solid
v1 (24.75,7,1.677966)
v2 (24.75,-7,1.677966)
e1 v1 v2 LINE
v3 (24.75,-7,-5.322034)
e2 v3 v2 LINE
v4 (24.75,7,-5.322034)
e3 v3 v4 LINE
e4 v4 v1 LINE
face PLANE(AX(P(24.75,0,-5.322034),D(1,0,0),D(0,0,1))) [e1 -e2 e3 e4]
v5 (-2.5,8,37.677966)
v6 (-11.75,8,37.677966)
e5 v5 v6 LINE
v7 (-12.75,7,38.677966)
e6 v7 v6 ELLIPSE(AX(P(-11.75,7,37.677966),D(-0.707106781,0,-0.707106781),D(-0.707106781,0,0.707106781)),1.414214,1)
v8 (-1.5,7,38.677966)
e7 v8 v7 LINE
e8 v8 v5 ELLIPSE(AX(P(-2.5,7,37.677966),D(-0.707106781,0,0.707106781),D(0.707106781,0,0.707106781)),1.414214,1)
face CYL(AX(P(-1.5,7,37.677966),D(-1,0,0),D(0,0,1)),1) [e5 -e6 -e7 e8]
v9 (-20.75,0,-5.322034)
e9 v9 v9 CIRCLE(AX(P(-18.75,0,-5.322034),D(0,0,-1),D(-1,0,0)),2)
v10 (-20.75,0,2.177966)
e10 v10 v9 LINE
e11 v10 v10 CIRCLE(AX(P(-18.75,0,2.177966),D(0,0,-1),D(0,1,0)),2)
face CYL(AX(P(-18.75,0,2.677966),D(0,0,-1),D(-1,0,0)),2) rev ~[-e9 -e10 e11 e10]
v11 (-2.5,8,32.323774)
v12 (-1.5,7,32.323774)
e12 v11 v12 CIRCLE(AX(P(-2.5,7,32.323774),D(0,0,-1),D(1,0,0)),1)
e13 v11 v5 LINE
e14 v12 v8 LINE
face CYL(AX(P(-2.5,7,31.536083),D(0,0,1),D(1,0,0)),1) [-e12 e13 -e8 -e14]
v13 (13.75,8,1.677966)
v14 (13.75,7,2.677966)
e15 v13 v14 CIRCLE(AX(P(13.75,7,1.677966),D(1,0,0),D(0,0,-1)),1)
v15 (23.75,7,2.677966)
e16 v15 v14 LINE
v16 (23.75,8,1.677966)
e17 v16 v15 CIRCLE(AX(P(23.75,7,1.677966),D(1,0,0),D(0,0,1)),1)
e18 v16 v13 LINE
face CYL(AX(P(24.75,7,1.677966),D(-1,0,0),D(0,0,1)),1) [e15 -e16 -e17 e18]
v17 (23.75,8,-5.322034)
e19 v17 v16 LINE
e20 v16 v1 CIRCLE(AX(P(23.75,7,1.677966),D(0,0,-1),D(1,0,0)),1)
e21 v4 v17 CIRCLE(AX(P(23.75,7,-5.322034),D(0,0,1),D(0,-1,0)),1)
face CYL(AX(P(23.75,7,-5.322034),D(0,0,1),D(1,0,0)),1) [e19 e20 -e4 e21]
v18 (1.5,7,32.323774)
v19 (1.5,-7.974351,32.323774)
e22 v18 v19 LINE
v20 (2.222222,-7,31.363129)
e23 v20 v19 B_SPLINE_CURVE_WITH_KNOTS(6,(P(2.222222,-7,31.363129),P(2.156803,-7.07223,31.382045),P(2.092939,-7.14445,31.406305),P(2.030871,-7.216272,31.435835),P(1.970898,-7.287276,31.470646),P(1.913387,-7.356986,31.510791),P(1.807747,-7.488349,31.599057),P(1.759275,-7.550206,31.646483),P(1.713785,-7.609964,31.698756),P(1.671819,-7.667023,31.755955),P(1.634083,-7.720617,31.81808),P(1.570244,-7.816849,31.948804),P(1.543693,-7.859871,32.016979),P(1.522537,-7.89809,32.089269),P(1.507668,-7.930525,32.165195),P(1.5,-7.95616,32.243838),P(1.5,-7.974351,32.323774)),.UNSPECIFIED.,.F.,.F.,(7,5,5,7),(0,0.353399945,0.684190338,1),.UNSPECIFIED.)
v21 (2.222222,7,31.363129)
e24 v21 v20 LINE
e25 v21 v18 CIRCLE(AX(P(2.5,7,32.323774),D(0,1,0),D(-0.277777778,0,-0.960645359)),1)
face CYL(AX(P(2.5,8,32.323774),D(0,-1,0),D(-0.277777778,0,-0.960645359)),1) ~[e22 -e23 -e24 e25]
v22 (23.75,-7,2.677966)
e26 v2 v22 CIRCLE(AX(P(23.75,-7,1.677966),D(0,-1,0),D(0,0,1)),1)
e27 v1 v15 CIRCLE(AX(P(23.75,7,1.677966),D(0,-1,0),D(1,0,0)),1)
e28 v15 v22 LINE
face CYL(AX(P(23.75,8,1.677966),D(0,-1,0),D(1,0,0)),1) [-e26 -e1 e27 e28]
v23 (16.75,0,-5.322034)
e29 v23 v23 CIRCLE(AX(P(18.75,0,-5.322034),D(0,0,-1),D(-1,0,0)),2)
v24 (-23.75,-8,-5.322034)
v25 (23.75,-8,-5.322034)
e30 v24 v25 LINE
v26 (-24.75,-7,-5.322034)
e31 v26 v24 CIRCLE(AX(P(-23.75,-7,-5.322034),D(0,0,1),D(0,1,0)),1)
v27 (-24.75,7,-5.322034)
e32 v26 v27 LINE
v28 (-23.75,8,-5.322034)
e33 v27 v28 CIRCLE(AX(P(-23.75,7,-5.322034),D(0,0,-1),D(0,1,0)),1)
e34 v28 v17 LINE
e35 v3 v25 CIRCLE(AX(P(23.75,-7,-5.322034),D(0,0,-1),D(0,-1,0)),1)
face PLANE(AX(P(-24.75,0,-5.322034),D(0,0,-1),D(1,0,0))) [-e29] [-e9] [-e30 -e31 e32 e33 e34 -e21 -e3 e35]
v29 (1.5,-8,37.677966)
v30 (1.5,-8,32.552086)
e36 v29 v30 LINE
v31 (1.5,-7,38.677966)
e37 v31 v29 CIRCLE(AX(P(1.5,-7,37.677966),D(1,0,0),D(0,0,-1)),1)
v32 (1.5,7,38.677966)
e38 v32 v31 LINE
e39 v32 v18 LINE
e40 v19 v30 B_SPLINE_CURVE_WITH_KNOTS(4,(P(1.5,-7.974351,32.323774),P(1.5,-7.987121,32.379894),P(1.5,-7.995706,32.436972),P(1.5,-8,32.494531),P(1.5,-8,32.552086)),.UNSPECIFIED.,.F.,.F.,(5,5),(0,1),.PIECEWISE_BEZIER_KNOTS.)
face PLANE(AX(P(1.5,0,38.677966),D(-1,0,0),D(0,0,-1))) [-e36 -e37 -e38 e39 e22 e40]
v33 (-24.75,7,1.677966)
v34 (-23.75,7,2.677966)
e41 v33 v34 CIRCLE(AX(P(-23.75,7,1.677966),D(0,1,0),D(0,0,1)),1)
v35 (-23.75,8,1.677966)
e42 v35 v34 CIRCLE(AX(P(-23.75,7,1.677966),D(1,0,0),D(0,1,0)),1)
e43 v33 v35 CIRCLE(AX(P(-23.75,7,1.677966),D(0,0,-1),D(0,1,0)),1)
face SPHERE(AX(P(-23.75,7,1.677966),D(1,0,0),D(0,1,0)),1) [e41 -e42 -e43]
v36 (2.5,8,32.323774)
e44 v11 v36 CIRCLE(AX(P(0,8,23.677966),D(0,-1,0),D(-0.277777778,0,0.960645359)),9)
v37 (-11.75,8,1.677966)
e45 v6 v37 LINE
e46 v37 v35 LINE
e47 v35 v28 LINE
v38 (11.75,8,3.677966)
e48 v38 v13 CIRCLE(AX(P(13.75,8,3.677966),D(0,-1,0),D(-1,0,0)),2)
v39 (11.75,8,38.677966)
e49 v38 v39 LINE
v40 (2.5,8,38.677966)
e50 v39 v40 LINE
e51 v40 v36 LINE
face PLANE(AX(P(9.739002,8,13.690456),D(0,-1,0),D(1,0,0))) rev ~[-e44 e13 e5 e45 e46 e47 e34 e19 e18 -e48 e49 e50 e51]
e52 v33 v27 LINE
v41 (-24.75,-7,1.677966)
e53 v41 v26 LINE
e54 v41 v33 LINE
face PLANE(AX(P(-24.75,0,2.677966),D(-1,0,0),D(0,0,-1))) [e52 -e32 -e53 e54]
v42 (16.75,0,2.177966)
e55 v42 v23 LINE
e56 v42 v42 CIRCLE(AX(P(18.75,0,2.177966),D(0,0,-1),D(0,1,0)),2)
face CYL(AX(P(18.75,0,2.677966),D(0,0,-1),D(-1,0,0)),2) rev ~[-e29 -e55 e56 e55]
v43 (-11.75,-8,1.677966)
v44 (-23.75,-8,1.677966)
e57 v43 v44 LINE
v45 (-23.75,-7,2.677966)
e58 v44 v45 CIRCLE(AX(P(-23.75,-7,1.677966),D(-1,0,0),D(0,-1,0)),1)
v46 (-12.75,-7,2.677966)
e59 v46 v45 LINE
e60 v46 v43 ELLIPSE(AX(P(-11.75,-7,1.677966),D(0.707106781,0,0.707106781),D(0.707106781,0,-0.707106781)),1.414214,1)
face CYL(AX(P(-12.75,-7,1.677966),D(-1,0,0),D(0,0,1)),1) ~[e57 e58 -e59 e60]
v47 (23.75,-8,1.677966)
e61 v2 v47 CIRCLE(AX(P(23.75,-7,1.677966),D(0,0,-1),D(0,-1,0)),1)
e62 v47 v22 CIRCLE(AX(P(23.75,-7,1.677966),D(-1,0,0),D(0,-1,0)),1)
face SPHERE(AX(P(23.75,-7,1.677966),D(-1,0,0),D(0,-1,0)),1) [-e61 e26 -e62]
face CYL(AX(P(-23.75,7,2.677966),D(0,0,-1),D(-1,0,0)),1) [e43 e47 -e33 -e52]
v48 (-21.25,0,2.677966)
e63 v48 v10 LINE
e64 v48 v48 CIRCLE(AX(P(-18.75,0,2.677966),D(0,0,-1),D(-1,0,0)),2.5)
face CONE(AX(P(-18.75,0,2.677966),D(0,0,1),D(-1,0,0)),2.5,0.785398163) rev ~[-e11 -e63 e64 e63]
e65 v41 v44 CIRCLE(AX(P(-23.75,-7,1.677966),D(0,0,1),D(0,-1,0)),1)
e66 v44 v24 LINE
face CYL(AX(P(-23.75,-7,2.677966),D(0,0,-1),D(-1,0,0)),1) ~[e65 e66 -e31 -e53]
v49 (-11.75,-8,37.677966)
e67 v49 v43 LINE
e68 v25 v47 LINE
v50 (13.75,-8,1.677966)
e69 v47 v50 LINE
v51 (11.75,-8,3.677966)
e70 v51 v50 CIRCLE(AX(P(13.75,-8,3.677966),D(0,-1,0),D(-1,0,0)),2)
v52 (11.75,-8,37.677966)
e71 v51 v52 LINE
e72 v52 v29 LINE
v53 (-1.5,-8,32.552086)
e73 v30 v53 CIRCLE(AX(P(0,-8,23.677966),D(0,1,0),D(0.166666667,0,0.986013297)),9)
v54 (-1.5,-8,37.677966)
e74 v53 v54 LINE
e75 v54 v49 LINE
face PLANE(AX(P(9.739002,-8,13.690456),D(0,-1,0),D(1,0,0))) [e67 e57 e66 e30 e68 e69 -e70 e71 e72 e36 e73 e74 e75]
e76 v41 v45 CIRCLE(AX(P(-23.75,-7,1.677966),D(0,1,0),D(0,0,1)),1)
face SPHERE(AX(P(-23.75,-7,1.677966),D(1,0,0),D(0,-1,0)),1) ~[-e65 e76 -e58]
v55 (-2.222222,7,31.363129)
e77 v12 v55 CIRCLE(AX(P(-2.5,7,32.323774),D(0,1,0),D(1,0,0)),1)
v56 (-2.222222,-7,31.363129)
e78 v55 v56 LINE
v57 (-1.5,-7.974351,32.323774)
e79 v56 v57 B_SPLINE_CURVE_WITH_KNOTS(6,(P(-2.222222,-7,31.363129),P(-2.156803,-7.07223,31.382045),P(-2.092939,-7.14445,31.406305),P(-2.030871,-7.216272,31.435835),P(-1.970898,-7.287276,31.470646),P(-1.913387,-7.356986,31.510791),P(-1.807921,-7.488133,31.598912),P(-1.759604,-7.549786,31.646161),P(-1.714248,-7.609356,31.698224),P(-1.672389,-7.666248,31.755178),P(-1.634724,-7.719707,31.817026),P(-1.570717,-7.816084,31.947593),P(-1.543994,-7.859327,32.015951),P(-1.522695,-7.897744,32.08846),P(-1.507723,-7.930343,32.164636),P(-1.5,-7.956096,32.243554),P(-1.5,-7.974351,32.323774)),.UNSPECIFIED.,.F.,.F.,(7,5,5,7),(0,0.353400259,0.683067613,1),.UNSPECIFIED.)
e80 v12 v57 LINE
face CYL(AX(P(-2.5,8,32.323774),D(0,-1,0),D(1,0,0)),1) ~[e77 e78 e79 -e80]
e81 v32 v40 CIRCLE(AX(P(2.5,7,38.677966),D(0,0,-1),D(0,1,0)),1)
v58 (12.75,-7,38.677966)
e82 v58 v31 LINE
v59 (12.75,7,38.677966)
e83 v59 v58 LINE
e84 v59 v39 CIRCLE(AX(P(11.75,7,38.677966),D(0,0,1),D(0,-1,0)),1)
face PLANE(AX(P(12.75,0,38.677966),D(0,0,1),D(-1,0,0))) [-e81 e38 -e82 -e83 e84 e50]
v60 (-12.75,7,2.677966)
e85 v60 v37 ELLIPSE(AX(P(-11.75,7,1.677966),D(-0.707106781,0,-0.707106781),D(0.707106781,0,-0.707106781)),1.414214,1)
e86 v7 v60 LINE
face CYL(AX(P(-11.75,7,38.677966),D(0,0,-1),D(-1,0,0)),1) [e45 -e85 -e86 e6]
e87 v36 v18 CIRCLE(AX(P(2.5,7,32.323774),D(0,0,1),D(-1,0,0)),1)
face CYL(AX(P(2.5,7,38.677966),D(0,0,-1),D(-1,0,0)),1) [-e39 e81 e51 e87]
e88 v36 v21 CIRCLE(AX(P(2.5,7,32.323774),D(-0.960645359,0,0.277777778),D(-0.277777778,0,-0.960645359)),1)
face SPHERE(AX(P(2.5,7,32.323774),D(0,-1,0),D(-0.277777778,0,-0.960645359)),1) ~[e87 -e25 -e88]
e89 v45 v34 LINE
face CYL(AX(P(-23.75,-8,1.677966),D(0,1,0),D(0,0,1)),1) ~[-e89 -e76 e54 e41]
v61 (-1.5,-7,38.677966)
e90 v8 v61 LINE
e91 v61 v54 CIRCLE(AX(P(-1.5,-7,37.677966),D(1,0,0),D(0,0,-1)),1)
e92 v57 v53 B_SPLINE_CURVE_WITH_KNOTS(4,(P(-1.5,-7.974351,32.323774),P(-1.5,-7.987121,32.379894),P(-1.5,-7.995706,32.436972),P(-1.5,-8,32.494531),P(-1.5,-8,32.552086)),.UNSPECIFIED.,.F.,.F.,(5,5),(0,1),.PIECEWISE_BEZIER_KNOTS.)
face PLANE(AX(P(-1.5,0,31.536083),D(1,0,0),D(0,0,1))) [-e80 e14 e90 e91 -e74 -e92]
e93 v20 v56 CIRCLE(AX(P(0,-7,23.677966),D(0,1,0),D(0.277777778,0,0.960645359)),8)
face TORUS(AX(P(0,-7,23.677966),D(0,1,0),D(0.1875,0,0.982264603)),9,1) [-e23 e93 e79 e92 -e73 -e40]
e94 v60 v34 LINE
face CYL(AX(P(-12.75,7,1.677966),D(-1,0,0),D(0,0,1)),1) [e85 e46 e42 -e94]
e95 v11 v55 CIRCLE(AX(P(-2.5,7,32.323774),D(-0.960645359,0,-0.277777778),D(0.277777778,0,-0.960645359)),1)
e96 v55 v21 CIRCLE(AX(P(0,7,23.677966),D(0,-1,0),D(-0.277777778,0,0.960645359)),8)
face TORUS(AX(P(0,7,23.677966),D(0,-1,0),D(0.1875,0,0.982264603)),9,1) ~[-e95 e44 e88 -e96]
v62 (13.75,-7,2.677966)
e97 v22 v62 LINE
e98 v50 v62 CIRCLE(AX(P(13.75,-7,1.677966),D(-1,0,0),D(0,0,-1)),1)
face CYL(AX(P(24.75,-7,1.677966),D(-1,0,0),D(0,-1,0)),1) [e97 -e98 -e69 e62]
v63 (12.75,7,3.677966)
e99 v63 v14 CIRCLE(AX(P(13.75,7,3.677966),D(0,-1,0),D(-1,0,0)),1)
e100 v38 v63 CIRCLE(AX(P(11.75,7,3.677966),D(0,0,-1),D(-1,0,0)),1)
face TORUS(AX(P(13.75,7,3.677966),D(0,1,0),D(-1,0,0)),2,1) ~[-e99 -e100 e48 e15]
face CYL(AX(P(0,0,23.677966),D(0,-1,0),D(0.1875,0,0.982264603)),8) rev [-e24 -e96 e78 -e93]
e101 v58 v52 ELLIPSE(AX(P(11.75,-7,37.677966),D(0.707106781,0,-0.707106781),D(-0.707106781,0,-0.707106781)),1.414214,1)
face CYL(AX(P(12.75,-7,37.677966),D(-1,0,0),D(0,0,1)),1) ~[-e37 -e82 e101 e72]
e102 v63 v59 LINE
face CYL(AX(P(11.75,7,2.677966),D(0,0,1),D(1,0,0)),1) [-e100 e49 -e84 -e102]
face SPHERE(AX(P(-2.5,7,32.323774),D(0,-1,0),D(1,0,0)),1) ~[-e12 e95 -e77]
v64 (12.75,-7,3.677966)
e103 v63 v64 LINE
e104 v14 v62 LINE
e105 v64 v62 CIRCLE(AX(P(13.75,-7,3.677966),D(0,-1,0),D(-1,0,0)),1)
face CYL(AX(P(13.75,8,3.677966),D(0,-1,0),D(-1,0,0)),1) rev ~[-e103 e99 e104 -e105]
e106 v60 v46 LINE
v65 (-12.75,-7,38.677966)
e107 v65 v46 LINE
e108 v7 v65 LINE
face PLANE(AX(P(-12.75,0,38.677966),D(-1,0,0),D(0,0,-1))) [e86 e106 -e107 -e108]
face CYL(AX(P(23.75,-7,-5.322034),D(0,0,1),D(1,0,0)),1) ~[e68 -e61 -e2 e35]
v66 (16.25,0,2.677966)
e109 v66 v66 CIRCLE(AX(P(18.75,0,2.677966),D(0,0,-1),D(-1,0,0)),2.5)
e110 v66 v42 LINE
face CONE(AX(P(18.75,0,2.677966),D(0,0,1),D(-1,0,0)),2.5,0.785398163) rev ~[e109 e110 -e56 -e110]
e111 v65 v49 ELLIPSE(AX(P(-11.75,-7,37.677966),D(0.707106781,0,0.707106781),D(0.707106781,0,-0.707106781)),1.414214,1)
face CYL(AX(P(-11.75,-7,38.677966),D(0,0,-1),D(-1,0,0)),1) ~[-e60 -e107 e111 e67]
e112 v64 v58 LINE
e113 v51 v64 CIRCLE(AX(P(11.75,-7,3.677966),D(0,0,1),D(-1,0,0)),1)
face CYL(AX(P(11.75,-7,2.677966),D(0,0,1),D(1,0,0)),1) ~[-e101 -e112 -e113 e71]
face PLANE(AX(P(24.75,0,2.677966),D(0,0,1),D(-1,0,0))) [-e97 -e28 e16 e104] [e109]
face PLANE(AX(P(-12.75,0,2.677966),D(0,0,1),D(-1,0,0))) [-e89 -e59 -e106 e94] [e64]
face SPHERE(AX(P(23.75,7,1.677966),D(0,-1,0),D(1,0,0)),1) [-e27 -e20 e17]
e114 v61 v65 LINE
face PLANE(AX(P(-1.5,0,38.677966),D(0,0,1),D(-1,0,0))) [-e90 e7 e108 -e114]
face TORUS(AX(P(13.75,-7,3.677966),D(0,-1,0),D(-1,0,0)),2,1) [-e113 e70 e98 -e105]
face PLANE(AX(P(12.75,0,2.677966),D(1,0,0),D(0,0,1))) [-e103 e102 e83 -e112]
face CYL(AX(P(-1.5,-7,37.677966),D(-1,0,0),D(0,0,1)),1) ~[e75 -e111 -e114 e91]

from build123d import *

# Parameters (mm, degrees)
F1_DEPTH       = 8
F3_D           = 4
F3_CSINK_D     = 5
F3_CSINK_ANGLE = 90
F4_R           = 1


with BuildPart() as f1:
    # F0 (on Front) → F1 (new body, symmetric)
    with BuildSketch(Plane.XZ):
        with BuildLine():
            Line((0, -5.3220339234), (24.75, -5.3220339234))
            Line((24.75, -5.3220339234), (24.75, 2.6779660766))
            Line((24.75, 2.6779660766), (12.75, 2.6779660766))
            Line((12.75, 2.6779660766), (12.75, 38.6779660766))
            Line((12.75, 38.6779660766), (1.5, 38.6779660766))
            Line((1.5, 38.6779660766), (1.5, 31.5360828994))
            ThreePointArc((1.5, 31.5360828994), (7.964450219, 22.9246184085), (0, 15.6779660766))
            Line((0, 15.6779660766), (0, -5.3220339234))
        make_face()
        with BuildLine():
            Line((-24.75, -5.3220339234), (0, -5.3220339234))
            Line((0, -5.3220339234), (0, 15.6779660766))
            ThreePointArc((0, 15.6779660766), (-7.964450219, 22.9246184085), (-1.5, 31.5360828994))
            Line((-1.5, 31.5360828994), (-1.5, 38.6779660766))
            Line((-1.5, 38.6779660766), (-12.75, 38.6779660766))
            Line((-12.75, 38.6779660766), (-12.75, 2.6779660766))
            Line((-12.75, 2.6779660766), (-24.75, 2.6779660766))
            Line((-24.75, 2.6779660766), (-24.75, -5.3220339234))
        make_face()
    extrude(amount=F1_DEPTH, both=True)

    # F3 (through all)
    with Locations(Plane.XY.offset(2.6779660766)):
        with Locations((18.75, 0), (-18.75, 0)):
            CounterSinkHole(F3_D / 2, F3_CSINK_D / 2, counter_sink_angle=F3_CSINK_ANGLE)

    # F4
    f4_edges = [f1.edges().sort_by_distance(p)[0] for p in [
        (-12.75, -8, 20.677966),
        (-7.125, -8, 38.677966),
        (7.125, -8, 38.677966),
        (12.75, -8, 20.677966),
        (18.75, -8, 2.677966),
        (-18.75, -8, 2.677966),
        (24.75, -8, -1.322034),
        (-24.75, -8, -1.322034),
        (12.75, 0, 2.677966),
        (24.75, 0, 2.677966),
        (24.75, 8, -1.322034),
        (12.75, 8, 20.677966),
        (1.5, 8, 35.107024),
        (-1.5, 8, 35.107024),
        (1.5, 0, 31.536083),
        (0, 8, 15.677966),
        (-1.5, 0, 31.536083),
        (0, -8, 15.677966),
        (-7.125, 8, 38.677966),
        (-12.75, 8, 20.677966),
        (-18.75, 8, 2.677966),
        (-24.75, 8, -1.322034),
        (-24.75, 0, 2.677966),
        (18.75, 8, 2.677966),
    ]]
    fillet(f4_edges, radius=F4_R)


solid = f1.part
